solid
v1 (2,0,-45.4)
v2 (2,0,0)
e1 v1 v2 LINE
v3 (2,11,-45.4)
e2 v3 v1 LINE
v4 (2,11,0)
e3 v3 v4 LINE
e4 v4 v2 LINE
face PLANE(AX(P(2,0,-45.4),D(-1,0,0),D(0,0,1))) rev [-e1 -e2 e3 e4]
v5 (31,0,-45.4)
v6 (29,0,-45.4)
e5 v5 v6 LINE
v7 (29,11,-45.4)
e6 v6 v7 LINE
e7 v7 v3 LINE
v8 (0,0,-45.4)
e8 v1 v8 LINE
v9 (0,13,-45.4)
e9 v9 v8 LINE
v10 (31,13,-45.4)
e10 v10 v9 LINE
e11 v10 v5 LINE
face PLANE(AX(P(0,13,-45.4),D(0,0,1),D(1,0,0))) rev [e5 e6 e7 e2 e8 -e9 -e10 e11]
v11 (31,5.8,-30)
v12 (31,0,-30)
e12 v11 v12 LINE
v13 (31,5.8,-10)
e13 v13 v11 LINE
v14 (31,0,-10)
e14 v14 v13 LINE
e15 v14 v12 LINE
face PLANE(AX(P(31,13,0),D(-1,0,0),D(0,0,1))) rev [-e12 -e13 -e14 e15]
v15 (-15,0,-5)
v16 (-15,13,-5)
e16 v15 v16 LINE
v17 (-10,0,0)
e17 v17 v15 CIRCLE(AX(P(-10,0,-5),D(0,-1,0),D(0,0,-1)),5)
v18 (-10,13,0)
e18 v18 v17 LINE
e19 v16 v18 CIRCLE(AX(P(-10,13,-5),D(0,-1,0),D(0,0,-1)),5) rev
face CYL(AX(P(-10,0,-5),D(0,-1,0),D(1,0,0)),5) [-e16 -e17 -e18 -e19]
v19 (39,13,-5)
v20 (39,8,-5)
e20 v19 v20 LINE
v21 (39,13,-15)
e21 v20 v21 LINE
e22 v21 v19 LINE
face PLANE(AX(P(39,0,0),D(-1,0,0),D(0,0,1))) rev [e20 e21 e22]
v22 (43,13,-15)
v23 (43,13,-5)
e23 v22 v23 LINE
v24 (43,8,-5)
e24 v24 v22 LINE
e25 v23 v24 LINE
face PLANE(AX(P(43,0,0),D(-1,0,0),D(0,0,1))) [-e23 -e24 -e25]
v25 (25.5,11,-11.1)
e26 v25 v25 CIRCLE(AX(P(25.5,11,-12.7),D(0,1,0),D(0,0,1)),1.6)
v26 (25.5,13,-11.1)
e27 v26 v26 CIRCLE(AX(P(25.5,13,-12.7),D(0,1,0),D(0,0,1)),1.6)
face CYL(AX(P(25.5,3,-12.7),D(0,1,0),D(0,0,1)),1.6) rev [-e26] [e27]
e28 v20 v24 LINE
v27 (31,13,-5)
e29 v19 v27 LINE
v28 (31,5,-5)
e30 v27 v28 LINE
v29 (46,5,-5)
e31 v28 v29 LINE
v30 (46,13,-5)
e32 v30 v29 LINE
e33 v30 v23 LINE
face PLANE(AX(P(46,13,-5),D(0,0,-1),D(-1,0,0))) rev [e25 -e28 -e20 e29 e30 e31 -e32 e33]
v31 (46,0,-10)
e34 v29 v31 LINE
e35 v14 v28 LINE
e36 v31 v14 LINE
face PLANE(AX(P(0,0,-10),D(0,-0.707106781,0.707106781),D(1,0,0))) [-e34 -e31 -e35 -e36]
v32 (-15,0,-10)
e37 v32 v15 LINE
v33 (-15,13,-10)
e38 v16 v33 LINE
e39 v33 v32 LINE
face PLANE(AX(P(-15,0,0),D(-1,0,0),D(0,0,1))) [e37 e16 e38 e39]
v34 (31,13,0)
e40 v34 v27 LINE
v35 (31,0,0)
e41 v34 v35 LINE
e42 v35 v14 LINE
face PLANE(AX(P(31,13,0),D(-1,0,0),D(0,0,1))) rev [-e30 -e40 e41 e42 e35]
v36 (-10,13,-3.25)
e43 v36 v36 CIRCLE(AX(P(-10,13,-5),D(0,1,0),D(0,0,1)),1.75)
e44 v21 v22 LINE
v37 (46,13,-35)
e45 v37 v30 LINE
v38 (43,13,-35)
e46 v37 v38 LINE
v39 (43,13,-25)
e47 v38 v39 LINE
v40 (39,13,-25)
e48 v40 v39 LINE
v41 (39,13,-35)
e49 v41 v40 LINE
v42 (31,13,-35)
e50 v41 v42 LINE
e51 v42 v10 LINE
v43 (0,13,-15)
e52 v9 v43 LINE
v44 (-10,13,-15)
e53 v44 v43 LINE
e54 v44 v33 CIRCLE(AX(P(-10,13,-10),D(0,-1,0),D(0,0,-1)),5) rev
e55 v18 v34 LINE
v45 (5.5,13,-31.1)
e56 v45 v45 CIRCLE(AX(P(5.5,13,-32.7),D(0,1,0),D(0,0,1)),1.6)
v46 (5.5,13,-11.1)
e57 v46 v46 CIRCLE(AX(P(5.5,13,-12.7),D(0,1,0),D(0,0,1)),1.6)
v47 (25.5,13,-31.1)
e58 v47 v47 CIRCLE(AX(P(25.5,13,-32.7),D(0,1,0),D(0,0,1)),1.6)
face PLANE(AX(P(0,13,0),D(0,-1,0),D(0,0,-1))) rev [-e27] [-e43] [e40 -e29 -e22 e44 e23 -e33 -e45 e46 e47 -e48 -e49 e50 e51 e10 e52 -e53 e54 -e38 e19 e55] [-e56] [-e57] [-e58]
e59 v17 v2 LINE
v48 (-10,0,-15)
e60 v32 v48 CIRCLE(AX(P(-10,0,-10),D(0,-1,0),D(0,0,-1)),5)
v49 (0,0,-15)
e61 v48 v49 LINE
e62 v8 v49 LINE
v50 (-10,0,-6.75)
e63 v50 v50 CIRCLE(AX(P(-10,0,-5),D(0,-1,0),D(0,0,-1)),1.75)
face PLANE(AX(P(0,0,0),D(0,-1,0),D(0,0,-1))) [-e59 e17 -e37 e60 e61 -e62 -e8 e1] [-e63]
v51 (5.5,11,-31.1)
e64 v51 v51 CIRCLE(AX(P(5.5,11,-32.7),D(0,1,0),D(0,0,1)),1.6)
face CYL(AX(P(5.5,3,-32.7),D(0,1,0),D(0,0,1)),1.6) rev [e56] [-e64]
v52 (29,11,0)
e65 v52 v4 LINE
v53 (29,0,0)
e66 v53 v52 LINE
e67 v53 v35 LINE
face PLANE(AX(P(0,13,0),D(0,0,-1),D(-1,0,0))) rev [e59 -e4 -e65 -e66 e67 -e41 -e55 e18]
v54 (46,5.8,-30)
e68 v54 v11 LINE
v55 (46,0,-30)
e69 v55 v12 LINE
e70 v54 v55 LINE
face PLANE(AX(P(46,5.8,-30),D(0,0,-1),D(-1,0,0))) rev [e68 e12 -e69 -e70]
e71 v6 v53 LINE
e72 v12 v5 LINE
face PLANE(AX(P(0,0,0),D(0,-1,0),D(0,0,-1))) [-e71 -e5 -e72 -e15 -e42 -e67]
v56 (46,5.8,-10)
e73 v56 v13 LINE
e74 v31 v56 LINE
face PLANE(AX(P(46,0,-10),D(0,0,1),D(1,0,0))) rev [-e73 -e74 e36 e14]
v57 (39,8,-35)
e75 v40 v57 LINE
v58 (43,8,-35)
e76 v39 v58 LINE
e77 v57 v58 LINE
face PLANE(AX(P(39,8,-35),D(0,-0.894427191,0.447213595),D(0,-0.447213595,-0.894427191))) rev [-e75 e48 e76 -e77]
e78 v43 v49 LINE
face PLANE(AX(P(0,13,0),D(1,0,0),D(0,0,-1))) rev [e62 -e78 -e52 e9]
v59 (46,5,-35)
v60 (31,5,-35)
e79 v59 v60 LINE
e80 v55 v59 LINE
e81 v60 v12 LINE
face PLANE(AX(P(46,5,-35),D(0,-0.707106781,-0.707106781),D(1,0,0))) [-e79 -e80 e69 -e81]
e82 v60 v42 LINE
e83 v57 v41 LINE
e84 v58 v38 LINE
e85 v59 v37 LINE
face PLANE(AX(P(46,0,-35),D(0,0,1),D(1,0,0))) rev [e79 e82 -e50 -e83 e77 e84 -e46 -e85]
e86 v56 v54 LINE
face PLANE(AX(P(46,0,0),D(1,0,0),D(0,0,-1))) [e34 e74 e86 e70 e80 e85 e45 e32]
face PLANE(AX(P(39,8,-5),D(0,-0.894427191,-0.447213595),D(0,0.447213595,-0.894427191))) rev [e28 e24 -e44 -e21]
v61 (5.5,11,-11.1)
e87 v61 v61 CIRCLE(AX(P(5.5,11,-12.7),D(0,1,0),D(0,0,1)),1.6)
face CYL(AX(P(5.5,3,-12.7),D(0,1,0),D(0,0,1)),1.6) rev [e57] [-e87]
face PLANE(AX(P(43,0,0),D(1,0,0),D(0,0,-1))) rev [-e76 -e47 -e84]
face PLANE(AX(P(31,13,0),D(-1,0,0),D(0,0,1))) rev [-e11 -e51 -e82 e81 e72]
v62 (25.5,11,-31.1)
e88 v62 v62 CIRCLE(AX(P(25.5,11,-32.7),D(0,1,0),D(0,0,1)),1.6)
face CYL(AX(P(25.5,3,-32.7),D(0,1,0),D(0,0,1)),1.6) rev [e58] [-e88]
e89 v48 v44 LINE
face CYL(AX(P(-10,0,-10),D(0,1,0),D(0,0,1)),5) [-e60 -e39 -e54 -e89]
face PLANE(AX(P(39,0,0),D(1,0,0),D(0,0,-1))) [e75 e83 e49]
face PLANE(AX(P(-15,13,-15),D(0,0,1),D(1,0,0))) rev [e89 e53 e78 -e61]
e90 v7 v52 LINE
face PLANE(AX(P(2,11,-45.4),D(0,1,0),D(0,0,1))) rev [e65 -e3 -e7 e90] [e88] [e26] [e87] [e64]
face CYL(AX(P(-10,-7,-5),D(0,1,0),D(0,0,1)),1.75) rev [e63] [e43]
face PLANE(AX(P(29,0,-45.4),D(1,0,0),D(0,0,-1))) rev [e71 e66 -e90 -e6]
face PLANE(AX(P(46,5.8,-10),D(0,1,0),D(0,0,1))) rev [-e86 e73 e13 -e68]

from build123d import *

# Parameters (mm, degrees)
SKETCH1_W           = 31
SKETCH1_H           = 45.4
BOSS_EXTRUDE1_DEPTH = 13
SKETCH2_W           = 27
SKETCH2_H           = 11
CUT_EXTRUDE1_DEPTH  = 57.490353159
SKETCH3_R           = 1.6
CUT_EXTRUDE2_DEPTH  = 10
SKETCH4_W           = 15
SKETCH4_H           = 13
BOSS_EXTRUDE2_DEPTH = 15
SKETCH5_R           = 1.75
CUT_EXTRUDE3_DEPTH  = 20
FILLET1_R           = 5
BOSS_EXTRUDE3_DEPTH = 15
CHAMFER1_SIZE       = 5
CUT_EXTRUDE4_DEPTH  = 4


with BuildPart() as part:
    # Sketch1 → Boss-Extrude1 (new body)
    with BuildSketch(Plane(origin=(0, 0, 0), x_dir=(1, 0, 0), z_dir=(0, 1, 0))):
        with Locations((15.5, 22.7)):
            Rectangle(SKETCH1_W, SKETCH1_H)
    extrude(amount=BOSS_EXTRUDE1_DEPTH)

    # Sketch2 → Cut-Extrude1 (cut, through all)
    with BuildSketch(Plane.XY):
        with Locations((15.5, 5.5)):
            Rectangle(SKETCH2_W, SKETCH2_H)
    extrude(amount=-CUT_EXTRUDE1_DEPTH, mode=Mode.SUBTRACT)

    # Sketch3 → Cut-Extrude2 (cut)
    with BuildSketch(Plane(origin=(0, 13, 0), x_dir=(1, 0, 0), z_dir=(0, 1, 0))):
        with Locations(Location((5.5, 32.7, 0), (0, 0, 270))):
            Circle(SKETCH3_R)
        with Locations(Location((25.5, 32.7, 0), (0, 0, 270))):
            Circle(SKETCH3_R)
        with Locations(Location((25.5, 12.7, 0), (0, 0, 270))):
            Circle(SKETCH3_R)
        with Locations(Location((5.5, 12.7, 0), (0, 0, 270))):
            Circle(SKETCH3_R)
    extrude(amount=-CUT_EXTRUDE2_DEPTH, mode=Mode.SUBTRACT)

    # Sketch4 → Boss-Extrude2 (add)
    with BuildSketch(Plane.ZY):
        with Locations((-7.5, 6.5)):
            Rectangle(SKETCH4_W, SKETCH4_H)
    extrude(amount=BOSS_EXTRUDE2_DEPTH)

    # Sketch5 → Cut-Extrude3 (cut)
    with BuildSketch(Plane(origin=(0, 13, 0), x_dir=(1, 0, 0), z_dir=(0, 1, 0))):
        with Locations(Location((-10, 5, 0), (0, 0, 270))):
            Circle(SKETCH5_R)
    extrude(amount=-CUT_EXTRUDE3_DEPTH, mode=Mode.SUBTRACT)

    # Fillet1
    fillet1_edges = [part.edges().sort_by_distance(p)[0] for p in [
        (-15, 6.5, -15),
        (-15, 6.5, 0),
    ]]
    fillet(fillet1_edges, radius=FILLET1_R)

    # Sketch6 → Boss-Extrude3 (add)
    with BuildSketch(Plane(origin=(31, 0, 0), x_dir=(0, 0, -1), z_dir=(1, 0, 0))):
        Polygon((5, 0), (10, 0), (10, 5.8), (30, 5.8), (30, 0), (35, 0), (35, 13), (5, 13), align=None)
    extrude(amount=BOSS_EXTRUDE3_DEPTH)

    # Chamfer1
    chamfer1_edges = [part.edges().sort_by_distance(p)[0] for p in [
        (38.5, 0, -5),
        (38.5, 0, -35),
    ]]
    chamfer(chamfer1_edges, length=CHAMFER1_SIZE - 0.0001)  # a hair under: the kernel refuses the full size

    # Sketch7 → Cut-Extrude4 (cut)
    with BuildSketch(Plane(origin=(43, 0, 0), x_dir=(0, 0, -1), z_dir=(1, 0, 0))):
        Polygon((5, 8), (15, 13), (5, 13), align=None)
        Polygon((35, 8), (25, 13), (35, 13), align=None)
    extrude(amount=-CUT_EXTRUDE4_DEPTH, mode=Mode.SUBTRACT)


solid = part.part
